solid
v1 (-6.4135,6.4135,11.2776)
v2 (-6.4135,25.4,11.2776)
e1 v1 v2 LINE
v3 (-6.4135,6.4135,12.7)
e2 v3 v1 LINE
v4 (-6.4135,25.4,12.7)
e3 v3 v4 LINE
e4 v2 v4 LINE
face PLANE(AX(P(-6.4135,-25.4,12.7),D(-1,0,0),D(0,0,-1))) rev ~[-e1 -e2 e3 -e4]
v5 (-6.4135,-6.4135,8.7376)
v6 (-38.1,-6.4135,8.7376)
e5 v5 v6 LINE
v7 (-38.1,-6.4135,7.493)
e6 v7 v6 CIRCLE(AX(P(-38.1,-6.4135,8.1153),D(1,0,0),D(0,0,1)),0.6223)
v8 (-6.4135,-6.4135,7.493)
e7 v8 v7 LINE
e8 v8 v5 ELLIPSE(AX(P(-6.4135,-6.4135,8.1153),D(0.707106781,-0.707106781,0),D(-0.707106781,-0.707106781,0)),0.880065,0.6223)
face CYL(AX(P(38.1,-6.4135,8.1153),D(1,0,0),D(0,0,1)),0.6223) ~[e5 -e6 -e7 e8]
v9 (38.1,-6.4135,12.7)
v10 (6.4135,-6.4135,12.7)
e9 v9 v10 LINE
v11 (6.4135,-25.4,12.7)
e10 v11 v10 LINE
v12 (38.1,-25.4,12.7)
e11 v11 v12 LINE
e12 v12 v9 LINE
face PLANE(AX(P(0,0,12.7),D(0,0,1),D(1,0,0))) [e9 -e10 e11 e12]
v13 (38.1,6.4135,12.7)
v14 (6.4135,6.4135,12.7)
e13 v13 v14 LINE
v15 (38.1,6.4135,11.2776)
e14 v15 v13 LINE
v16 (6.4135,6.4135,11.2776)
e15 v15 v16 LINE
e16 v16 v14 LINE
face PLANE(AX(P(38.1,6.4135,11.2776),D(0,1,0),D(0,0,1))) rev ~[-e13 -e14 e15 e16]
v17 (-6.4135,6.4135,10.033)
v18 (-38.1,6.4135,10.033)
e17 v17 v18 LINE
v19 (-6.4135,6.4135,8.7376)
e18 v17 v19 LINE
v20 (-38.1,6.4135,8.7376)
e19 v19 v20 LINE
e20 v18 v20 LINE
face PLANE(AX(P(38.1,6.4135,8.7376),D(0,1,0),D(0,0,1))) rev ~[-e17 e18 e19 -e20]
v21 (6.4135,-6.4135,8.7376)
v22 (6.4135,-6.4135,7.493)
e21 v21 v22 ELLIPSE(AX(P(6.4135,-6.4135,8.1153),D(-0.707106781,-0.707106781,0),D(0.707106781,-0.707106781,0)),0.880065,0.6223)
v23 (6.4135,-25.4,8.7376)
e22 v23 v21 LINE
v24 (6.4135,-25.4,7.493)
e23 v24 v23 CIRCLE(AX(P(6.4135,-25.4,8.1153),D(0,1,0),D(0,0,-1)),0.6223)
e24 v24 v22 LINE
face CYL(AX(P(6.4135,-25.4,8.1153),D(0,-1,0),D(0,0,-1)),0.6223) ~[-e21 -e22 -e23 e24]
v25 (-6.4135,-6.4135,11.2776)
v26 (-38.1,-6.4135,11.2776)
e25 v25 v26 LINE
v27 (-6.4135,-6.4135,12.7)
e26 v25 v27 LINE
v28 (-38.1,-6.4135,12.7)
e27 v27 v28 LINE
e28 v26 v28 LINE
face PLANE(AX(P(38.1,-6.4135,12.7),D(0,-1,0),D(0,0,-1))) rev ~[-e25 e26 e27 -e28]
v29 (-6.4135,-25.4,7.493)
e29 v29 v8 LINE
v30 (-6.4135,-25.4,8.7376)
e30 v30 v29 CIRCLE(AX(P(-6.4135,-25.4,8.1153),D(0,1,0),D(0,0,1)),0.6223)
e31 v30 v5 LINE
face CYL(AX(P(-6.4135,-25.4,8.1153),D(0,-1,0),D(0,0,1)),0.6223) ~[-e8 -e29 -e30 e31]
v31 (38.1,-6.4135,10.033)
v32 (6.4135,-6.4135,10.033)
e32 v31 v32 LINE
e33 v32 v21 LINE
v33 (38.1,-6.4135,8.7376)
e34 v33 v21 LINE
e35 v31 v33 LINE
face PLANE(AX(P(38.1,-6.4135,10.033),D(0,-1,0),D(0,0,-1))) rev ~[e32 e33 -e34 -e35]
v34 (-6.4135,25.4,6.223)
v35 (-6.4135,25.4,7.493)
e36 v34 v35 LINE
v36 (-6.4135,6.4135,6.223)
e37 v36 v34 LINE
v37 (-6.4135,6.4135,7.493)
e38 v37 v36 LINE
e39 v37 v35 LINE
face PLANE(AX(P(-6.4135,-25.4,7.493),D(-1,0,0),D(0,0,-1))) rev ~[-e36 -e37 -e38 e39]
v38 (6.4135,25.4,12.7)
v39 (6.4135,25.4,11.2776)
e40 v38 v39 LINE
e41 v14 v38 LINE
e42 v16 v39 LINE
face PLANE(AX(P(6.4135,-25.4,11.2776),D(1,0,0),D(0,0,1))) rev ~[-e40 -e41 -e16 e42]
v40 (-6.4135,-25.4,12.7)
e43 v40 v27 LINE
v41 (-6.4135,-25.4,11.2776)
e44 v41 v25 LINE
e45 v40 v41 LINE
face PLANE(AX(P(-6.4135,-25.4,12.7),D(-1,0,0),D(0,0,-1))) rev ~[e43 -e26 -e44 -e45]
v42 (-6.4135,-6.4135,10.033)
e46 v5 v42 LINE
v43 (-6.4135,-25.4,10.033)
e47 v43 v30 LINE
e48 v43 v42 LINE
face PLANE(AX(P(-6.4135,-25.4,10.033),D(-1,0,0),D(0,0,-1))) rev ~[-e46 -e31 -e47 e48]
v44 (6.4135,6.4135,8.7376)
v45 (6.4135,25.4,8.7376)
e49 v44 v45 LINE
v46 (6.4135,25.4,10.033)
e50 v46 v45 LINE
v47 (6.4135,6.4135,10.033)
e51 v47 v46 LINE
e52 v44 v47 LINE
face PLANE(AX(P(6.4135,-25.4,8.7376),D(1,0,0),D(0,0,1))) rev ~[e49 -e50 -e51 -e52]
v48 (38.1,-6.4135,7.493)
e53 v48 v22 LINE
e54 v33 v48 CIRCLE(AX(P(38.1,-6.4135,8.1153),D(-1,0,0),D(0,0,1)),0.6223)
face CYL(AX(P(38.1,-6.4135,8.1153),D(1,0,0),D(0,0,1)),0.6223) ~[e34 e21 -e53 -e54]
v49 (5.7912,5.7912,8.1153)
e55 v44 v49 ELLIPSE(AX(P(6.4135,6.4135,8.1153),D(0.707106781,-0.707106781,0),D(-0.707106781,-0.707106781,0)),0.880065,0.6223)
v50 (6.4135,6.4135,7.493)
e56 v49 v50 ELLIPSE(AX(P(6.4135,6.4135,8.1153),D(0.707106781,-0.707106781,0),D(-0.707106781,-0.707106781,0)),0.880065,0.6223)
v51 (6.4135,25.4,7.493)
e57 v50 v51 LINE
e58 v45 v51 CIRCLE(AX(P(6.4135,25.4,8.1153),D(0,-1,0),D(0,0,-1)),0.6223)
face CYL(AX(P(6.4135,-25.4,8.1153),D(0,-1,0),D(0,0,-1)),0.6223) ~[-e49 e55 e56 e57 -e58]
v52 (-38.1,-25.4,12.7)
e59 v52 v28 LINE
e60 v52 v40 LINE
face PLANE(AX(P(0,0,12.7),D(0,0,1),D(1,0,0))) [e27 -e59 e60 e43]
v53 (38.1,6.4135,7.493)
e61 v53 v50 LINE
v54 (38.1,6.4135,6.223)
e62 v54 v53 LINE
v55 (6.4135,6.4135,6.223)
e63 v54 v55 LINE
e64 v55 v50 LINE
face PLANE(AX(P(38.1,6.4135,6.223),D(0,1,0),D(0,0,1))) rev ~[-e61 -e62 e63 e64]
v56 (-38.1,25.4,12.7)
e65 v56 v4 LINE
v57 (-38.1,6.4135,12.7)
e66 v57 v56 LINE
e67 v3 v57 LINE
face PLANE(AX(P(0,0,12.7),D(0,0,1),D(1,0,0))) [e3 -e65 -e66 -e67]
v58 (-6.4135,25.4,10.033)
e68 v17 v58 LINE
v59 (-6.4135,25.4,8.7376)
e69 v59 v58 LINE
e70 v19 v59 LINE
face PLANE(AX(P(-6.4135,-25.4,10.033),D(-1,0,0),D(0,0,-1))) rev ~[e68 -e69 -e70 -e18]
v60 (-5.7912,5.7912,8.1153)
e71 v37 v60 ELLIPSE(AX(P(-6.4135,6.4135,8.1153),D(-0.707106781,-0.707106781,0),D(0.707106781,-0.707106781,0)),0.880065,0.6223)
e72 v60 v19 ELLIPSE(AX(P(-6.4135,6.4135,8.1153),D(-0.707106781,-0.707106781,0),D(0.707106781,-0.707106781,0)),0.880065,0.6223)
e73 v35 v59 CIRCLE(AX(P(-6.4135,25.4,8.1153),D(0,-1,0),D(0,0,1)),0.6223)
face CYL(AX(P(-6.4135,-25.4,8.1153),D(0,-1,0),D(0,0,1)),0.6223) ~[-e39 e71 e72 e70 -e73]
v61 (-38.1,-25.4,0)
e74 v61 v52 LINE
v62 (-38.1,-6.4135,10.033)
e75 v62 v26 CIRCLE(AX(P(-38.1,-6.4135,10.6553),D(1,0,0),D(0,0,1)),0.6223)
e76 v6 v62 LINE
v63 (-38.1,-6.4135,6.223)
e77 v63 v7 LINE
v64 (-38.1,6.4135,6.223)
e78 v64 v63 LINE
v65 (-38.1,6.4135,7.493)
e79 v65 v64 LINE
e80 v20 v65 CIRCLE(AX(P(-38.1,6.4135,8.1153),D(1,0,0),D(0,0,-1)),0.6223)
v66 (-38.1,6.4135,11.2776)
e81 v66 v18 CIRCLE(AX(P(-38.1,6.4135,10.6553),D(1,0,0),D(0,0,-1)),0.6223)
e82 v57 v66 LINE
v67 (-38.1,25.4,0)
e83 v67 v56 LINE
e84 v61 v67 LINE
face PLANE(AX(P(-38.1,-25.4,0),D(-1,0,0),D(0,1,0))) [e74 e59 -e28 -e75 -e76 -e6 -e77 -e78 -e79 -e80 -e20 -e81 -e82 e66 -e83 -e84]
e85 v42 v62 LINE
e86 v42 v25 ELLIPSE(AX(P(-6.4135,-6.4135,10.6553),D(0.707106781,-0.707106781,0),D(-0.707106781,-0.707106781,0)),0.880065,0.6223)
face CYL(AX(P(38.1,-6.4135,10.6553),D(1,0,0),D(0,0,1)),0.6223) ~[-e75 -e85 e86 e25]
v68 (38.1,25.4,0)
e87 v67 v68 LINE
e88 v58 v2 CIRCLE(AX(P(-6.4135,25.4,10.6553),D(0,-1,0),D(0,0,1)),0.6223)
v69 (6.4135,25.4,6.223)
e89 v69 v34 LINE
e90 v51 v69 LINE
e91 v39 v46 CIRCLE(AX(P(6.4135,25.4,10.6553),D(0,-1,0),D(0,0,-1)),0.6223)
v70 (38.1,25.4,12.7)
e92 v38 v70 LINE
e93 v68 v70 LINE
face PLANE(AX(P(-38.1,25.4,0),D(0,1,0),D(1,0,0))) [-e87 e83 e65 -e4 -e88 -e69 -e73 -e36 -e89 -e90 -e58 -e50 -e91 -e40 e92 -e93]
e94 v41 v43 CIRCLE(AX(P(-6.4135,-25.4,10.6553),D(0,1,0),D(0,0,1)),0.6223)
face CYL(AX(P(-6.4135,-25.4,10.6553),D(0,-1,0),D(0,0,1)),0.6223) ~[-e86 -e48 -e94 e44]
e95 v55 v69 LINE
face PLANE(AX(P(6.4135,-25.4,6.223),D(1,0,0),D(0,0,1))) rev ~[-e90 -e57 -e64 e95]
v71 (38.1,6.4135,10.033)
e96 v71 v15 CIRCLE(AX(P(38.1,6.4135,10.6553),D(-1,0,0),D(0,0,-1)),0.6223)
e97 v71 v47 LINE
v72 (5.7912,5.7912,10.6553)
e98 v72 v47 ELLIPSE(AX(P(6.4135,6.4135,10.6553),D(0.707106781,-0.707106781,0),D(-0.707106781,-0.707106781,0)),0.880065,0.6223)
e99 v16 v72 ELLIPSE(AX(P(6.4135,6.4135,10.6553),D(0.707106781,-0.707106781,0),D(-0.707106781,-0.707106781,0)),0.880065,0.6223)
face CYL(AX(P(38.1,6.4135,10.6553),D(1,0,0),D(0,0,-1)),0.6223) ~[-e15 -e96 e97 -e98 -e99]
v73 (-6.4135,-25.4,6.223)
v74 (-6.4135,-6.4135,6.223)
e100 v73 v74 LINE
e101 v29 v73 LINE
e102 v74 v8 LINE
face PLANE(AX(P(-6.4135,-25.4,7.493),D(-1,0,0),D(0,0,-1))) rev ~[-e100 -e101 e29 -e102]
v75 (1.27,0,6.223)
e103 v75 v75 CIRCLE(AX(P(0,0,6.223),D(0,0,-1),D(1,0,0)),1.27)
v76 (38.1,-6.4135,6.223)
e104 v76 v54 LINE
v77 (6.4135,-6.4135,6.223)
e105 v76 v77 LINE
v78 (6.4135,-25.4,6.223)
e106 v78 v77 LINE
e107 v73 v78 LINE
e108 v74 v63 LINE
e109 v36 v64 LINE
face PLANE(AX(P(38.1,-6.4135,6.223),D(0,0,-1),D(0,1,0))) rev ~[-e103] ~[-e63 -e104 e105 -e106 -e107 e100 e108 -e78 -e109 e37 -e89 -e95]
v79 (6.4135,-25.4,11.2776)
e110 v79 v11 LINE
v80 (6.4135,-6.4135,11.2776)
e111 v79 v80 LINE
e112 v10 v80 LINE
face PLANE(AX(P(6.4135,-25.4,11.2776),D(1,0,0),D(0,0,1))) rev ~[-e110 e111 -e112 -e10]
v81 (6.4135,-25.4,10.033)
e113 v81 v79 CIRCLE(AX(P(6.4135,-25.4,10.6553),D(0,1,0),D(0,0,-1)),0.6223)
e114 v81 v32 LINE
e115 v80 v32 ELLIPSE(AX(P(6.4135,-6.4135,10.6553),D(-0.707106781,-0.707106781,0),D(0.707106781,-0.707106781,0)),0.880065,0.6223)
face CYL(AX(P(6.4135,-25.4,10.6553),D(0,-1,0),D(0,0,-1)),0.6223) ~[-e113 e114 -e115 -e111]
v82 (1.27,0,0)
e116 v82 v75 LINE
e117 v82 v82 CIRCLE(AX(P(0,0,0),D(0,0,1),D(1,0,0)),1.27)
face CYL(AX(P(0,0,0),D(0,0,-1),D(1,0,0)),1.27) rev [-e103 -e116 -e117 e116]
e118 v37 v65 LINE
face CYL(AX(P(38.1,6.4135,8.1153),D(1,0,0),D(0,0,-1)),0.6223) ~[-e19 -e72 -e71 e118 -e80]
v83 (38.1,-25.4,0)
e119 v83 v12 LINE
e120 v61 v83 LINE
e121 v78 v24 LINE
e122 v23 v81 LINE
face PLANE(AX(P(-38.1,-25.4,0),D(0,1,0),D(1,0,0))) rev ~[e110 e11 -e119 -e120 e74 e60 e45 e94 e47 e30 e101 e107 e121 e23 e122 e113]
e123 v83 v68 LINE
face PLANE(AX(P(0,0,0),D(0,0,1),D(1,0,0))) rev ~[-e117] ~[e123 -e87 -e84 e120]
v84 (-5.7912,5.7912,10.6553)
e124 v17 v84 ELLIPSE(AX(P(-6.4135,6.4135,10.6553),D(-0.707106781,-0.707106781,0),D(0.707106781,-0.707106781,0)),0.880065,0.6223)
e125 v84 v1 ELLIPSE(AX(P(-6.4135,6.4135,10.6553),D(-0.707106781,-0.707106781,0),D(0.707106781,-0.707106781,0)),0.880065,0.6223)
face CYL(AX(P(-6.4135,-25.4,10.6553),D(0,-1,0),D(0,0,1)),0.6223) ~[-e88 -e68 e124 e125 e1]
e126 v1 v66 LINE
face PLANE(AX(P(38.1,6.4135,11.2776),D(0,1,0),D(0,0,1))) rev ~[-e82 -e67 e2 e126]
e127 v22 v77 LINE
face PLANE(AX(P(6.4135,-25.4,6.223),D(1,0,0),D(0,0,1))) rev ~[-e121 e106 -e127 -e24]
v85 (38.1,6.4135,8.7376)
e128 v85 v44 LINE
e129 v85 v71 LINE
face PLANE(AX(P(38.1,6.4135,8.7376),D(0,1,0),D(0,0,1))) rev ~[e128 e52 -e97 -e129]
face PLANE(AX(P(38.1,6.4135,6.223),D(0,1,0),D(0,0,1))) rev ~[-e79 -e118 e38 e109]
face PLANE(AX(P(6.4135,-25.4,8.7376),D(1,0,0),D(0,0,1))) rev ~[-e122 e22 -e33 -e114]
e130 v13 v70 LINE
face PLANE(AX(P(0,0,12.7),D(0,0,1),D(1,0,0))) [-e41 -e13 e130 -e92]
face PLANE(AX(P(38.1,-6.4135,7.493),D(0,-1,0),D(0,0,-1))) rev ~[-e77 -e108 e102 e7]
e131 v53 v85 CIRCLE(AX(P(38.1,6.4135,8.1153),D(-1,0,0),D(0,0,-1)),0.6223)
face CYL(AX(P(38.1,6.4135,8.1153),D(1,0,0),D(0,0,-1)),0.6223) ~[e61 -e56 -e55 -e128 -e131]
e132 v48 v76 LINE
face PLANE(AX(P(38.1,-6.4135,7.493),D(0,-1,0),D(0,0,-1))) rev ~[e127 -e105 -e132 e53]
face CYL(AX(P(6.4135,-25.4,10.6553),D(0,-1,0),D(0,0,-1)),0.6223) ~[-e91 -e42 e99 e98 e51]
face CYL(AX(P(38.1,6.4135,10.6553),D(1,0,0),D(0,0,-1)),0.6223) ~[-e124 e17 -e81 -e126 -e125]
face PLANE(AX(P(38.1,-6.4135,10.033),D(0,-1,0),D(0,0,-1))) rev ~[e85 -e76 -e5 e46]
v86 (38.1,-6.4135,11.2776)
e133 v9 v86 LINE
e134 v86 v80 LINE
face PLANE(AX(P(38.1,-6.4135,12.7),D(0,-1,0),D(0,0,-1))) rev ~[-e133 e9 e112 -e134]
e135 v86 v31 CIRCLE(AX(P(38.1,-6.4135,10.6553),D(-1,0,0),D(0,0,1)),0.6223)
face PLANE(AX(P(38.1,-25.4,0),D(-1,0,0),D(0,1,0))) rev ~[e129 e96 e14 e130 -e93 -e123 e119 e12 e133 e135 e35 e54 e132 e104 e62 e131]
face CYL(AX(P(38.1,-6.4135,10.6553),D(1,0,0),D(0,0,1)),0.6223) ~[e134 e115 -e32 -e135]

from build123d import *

# Parameters (mm, degrees)
F0_W     = 76.2
F0_H     = 50.8
F1_DEPTH = 12.7
F3_DEPTH = 50.801
F5_DEPTH = 76.201
F6_R     = 1.27
F7_DEPTH = 12.701


# Not quite as in the source:
# - a feature names something its author has since deleted; it is built from what else it names


with BuildPart() as f1:
    # F0 (on Top) → F1 (new body)
    with BuildSketch(Plane.XY):
        Rectangle(F0_W, F0_H)
    extrude(amount=F1_DEPTH)

    # F2 (on face) → F3 (cut, through all)
    with BuildSketch(Plane.XZ.offset(25.4)):
        with BuildLine():
            Line((6.4135, 12.7), (-6.4135, 12.7))
            Line((-6.4135, 12.7), (-6.4135, 11.2776))
            ThreePointArc((-6.4135, 11.2776), (-5.7912, 10.6553), (-6.4135, 10.033))
            Line((-6.4135, 10.033), (-6.4135, 8.7376))
            ThreePointArc((-6.4135, 8.7376), (-5.7912, 8.1153), (-6.4135, 7.493))
            Line((-6.4135, 7.493), (-6.4135, 6.223))
            Line((-6.4135, 6.223), (6.4135, 6.223))
            Line((6.4135, 6.223), (6.4135, 7.493))
            ThreePointArc((6.4135, 7.493), (5.7912, 8.1153), (6.4135, 8.7376))
            Line((6.4135, 8.7376), (6.4135, 10.033))
            ThreePointArc((6.4135, 10.033), (5.7912, 10.6553), (6.4135, 11.2776))
            Line((6.4135, 11.2776), (6.4135, 12.7))
        make_face()
    extrude(amount=-F3_DEPTH, mode=Mode.SUBTRACT)

    # F4 (on face) → F5 (cut, through all)
    with BuildSketch(Plane.YZ.offset(38.1)):
        with BuildLine():
            Line((6.4135, 12.7), (-6.4135, 12.7))
            Line((-6.4135, 12.7), (-6.4135, 11.2776))
            ThreePointArc((-6.4135, 11.2776), (-5.7912, 10.6553), (-6.4135, 10.033))
            Line((-6.4135, 10.033), (-6.4135, 8.7376))
            ThreePointArc((-6.4135, 8.7376), (-5.7912, 8.1153), (-6.4135, 7.493))
            Line((-6.4135, 7.493), (-6.4135, 6.223))
            Line((-6.4135, 6.223), (6.4135, 6.223))
            Line((6.4135, 6.223), (6.4135, 7.493))
            ThreePointArc((6.4135, 7.493), (5.7912, 8.1153), (6.4135, 8.7376))
            Line((6.4135, 8.7376), (6.4135, 10.033))
            ThreePointArc((6.4135, 10.033), (5.7912, 10.6553), (6.4135, 11.2776))
            Line((6.4135, 11.2776), (6.4135, 12.7))
        make_face()
    extrude(amount=-F5_DEPTH, mode=Mode.SUBTRACT)

    # F6 (on Top) → F7 (cut, through all)
    with BuildSketch(Plane.XY):
        Circle(F6_R)
    extrude(amount=F7_DEPTH, mode=Mode.SUBTRACT)


solid = f1.part
